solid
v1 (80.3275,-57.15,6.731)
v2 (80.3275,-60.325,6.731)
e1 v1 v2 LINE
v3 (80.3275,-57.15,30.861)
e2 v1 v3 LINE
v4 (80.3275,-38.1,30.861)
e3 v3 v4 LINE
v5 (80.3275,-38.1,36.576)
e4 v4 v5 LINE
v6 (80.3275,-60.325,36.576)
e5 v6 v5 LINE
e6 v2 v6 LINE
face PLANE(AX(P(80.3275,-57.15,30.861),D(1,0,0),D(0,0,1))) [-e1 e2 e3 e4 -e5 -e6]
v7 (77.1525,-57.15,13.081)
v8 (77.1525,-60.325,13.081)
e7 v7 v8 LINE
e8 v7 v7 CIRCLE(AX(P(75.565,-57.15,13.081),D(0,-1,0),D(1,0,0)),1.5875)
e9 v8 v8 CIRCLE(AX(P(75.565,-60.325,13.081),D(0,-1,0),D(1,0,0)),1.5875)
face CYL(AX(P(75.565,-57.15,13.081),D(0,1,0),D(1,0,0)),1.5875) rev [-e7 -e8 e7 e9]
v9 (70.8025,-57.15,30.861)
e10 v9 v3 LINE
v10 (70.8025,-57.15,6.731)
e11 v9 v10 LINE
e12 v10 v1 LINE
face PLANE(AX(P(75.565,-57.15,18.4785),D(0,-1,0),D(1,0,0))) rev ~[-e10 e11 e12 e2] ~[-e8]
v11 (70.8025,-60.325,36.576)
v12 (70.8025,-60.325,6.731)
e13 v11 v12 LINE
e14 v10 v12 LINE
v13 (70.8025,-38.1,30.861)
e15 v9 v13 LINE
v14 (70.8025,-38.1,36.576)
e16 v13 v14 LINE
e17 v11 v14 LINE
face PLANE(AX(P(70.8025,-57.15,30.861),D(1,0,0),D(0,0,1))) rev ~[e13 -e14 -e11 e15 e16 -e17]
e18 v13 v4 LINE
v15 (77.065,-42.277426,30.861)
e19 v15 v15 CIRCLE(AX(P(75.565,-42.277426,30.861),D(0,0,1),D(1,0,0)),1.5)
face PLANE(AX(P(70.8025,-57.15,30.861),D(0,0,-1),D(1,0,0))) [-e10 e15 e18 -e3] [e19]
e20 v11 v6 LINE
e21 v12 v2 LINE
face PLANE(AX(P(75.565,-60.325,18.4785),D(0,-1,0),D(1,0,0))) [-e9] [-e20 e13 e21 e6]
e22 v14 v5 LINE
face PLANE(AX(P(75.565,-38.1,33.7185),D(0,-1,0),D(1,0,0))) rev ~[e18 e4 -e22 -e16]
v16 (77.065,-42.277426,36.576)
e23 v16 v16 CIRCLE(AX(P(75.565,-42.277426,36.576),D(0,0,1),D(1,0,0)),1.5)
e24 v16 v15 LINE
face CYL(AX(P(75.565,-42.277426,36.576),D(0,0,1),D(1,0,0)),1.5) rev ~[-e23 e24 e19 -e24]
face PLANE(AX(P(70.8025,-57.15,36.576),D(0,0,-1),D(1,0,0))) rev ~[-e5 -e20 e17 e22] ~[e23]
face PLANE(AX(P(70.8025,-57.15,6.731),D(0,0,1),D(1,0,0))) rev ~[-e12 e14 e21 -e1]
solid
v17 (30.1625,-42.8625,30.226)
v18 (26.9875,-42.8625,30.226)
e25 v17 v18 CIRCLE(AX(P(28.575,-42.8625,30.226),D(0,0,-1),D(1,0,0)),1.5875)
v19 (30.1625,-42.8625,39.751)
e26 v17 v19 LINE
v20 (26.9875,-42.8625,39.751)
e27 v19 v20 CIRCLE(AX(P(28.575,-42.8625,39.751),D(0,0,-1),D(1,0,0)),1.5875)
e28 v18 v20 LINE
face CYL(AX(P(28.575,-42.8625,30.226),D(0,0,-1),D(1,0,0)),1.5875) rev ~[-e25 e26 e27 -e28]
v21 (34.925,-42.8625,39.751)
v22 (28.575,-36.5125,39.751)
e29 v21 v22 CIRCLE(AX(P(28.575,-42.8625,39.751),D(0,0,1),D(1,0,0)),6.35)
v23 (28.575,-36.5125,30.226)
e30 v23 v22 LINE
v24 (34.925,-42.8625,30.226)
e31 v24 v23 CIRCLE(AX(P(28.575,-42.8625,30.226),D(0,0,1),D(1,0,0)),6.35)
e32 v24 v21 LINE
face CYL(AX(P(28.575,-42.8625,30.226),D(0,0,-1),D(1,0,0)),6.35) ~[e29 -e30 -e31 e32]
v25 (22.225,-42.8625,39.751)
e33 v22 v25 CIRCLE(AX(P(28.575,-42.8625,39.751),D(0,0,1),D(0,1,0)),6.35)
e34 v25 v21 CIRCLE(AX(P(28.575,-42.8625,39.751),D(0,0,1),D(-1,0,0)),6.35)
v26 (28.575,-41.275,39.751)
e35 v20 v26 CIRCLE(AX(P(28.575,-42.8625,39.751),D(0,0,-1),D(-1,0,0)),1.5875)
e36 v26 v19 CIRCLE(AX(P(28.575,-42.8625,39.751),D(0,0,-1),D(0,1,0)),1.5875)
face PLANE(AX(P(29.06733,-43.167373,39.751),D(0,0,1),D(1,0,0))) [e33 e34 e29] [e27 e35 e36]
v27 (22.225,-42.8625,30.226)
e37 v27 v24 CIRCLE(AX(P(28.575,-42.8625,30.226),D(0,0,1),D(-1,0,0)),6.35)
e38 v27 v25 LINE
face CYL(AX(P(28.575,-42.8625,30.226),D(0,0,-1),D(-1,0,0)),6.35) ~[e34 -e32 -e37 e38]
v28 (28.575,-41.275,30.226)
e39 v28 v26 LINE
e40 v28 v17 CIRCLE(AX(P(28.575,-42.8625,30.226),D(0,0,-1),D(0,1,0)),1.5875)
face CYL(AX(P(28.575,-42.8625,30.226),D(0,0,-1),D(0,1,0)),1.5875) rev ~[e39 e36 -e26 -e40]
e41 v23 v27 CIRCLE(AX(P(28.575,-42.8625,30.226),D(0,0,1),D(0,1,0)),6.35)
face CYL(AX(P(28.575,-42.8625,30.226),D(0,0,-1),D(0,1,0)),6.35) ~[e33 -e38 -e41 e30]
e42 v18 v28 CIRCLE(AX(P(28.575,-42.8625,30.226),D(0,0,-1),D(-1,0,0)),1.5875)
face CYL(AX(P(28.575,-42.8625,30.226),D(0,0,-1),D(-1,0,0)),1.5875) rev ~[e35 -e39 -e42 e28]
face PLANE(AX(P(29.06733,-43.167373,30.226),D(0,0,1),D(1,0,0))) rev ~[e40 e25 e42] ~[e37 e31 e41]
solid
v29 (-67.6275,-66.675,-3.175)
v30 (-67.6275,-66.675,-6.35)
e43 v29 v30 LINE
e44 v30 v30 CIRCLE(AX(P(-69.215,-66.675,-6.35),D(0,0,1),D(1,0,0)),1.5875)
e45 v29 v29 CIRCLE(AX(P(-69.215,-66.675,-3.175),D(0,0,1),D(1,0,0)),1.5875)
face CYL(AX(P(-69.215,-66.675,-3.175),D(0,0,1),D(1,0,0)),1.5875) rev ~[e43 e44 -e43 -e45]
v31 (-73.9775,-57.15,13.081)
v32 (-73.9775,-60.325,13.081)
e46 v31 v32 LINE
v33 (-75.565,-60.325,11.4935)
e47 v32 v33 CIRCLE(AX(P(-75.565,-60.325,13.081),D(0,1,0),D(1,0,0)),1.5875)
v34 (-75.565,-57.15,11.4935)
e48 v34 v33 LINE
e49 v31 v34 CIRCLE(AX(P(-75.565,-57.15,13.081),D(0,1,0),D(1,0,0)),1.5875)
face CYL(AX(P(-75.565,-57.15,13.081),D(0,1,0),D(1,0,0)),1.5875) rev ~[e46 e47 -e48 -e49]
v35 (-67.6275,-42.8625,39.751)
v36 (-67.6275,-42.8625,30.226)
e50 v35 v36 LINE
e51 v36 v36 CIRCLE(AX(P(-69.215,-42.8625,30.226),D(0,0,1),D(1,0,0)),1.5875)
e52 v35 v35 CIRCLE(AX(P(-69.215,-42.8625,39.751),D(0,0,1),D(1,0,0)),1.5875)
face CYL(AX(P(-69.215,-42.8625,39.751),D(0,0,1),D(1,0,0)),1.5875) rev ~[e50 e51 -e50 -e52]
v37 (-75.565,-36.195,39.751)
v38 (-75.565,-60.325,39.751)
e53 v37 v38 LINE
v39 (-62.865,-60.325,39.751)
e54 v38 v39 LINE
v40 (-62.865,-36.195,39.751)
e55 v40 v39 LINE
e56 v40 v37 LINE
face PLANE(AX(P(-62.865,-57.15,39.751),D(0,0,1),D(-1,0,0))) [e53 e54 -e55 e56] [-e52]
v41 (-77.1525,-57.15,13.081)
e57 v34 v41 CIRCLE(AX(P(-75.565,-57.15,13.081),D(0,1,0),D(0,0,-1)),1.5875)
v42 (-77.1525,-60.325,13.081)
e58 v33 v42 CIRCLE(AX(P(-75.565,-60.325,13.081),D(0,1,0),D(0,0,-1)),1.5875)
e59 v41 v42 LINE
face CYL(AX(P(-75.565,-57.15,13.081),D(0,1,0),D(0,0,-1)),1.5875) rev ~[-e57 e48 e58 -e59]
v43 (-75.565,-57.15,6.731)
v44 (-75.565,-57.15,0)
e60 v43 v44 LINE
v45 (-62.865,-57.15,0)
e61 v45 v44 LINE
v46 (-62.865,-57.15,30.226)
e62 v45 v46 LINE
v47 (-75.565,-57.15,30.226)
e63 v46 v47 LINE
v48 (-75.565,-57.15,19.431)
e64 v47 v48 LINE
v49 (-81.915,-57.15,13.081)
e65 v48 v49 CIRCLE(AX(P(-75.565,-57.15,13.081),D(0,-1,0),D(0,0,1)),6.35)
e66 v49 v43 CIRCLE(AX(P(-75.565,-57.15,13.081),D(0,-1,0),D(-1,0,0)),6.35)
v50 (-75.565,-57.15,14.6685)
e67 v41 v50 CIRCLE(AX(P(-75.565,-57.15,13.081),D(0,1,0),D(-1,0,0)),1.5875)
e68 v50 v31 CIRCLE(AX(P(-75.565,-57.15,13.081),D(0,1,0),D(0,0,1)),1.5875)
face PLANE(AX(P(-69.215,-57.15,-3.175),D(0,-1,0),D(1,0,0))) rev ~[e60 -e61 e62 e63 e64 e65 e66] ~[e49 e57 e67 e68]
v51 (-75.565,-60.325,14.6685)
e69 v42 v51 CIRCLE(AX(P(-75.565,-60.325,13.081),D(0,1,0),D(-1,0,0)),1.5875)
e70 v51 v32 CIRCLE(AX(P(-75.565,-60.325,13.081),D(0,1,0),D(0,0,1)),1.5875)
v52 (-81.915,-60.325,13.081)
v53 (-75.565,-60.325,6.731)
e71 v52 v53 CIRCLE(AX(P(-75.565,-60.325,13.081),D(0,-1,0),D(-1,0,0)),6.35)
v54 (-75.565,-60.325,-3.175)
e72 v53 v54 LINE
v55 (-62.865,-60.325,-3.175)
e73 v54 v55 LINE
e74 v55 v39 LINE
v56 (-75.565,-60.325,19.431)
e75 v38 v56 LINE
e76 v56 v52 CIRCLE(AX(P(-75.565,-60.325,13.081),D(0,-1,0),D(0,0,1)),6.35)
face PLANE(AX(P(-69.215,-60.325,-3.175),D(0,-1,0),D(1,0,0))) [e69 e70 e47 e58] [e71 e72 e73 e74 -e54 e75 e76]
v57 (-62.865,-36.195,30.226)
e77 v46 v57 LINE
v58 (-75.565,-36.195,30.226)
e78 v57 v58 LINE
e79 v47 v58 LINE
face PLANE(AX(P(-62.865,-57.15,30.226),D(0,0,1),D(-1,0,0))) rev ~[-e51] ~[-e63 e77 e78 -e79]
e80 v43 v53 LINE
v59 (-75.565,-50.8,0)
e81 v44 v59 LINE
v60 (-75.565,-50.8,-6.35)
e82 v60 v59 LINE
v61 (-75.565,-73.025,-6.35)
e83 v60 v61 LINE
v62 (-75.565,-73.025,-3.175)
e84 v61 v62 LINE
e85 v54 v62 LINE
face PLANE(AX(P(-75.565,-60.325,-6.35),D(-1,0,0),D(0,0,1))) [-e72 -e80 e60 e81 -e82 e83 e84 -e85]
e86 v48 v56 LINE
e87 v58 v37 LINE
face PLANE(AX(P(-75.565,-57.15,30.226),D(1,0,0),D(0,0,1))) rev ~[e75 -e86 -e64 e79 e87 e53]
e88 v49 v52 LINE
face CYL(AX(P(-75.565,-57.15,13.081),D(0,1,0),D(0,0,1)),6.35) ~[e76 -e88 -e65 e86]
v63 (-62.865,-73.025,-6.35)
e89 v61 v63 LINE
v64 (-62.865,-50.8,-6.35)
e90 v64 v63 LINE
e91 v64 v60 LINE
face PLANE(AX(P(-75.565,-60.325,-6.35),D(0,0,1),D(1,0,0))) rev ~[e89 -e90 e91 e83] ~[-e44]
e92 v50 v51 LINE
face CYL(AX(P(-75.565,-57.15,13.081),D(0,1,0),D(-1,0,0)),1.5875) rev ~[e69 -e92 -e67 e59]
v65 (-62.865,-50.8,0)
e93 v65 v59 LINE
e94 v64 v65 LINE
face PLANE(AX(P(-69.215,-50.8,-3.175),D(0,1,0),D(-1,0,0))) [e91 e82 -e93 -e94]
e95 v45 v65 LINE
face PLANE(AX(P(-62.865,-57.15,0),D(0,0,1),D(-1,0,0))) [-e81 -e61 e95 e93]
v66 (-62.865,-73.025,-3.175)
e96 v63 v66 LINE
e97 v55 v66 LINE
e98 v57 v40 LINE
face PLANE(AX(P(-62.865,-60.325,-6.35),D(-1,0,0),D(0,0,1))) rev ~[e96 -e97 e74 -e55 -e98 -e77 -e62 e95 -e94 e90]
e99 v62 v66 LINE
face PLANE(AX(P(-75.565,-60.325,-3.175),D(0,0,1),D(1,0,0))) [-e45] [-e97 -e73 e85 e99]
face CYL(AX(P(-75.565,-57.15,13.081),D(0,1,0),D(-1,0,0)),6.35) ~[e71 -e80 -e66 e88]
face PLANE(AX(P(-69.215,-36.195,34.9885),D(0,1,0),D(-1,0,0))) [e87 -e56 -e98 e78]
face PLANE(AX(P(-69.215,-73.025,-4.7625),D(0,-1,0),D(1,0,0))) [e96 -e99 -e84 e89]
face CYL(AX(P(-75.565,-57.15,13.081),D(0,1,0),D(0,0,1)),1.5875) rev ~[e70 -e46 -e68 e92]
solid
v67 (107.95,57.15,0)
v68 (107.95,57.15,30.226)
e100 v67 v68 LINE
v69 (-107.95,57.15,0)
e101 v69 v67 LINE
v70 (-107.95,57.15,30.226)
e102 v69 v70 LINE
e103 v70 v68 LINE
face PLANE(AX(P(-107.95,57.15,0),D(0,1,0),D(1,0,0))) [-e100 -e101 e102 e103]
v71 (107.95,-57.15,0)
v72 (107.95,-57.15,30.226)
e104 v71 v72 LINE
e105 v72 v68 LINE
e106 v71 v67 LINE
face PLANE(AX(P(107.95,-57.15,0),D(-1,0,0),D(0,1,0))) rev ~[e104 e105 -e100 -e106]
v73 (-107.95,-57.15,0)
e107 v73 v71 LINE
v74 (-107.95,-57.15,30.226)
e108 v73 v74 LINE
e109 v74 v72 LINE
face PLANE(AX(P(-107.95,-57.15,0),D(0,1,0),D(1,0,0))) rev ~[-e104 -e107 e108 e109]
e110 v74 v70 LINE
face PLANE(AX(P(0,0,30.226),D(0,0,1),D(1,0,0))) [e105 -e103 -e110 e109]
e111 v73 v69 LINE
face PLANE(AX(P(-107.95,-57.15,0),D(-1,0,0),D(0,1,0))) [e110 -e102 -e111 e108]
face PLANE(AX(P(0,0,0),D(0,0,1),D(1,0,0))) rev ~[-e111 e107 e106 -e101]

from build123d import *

# Parameters (mm, degrees)
F0_W      = 215.9
F0_H      = 114.3
F1_DEPTH  = 30.226
F4_W      = 12.7
F4_H      = 6.35
F4_H_2    = 9.525
F5_DEPTH  = 3.175
F6_W      = 12.7
F6_H      = 6.35
F7_DEPTH  = 6.35
F6_H_2    = 9.525
F8_DEPTH  = 20.955
F9_W      = 12.7
F9_H      = 3.175
F10_DEPTH = 12.7
F11_R     = 1.5875
F12_DEPTH = 25.4
F13_R     = 1.5875
F14_DEPTH = 25.4
F17_DEPTH = 9.525
F18_W     = 9.525
F18_H     = 23.495
F18_R     = 1.5875
F18_H_2   = 5.715
F18_H_3   = 0.635
F19_DEPTH = 3.175
F20_DEPTH = 19.05
F21_R     = 1.5
F22_DEPTH = 25.4


with BuildPart() as f1:
    # F0 (on Top) → F1 (new body)
    with BuildSketch(Plane.XY):
        Rectangle(F0_W, F0_H)
    extrude(amount=F1_DEPTH)


with BuildPart() as f5:
    # F4 (on face) → F5 (new body)
    with BuildSketch(Plane.XZ.offset(57.15)):
        with Locations((-69.215, -3.175)):
            Rectangle(F4_W, F4_H)
        with BuildLine():
            Line((-75.565, 6.731), (-75.565, 0))
            Line((-75.565, 0), (-62.865, 0))
            Line((-62.865, 0), (-62.865, 30.226))
            Line((-62.865, 30.226), (-75.565, 30.226))
            Line((-75.565, 30.226), (-75.565, 19.431))
            ThreePointArc((-75.565, 19.431), (-71.0748719395, 17.5711280605), (-69.215, 13.081))
            ThreePointArc((-69.215, 13.081), (-71.0748719395, 8.5908719395), (-75.565, 6.731))
        make_face()
        with BuildLine():
            ThreePointArc((-81.915, 13.081), (-80.0551280605, 8.5908719395), (-75.565, 6.731))
            Line((-75.565, 6.731), (-75.565, 11.4935))
            ThreePointArc((-75.565, 11.4935), (-76.6875320151, 11.9584679849), (-77.1525, 13.081))
            Line((-77.1525, 13.081), (-81.915, 13.081))
        make_face()
        with BuildLine():
            Line((-75.565, 11.4935), (-75.565, 6.731))
            ThreePointArc((-75.565, 6.731), (-71.0748719395, 8.5908719395), (-69.215, 13.081))
            ThreePointArc((-69.215, 13.081), (-71.0748719395, 17.5711280605), (-75.565, 19.431))
            Line((-75.565, 19.431), (-75.565, 14.6685))
            ThreePointArc((-75.565, 14.6685), (-74.4424679849, 14.2035320151), (-73.9775, 13.081))
            ThreePointArc((-73.9775, 13.081), (-74.4424679849, 11.9584679849), (-75.565, 11.4935))
        make_face()
        with Locations((-69.215, 34.9885)):
            Rectangle(F4_W, F4_H_2)
        with BuildLine():
            ThreePointArc((-75.565, 19.431), (-80.0551280605, 17.5711280605), (-81.915, 13.081))
            Line((-81.915, 13.081), (-77.1525, 13.081))
            ThreePointArc((-77.1525, 13.081), (-76.6875320151, 14.2035320151), (-75.565, 14.6685))
            Line((-75.565, 14.6685), (-75.565, 19.431))
        make_face()
    extrude(amount=F5_DEPTH)

    # F6 (on face) → F7 (join)
    with BuildSketch(Plane(origin=(0, -57.15, 0), x_dir=(-1, 0, 0), z_dir=(0, 1, 0))):
        with Locations((69.215, -3.175)):
            Rectangle(F6_W, F6_H)
    extrude(amount=F7_DEPTH)

    # F6 (on face) → F8 (join)
    with BuildSketch(Plane(origin=(0, -57.15, 0), x_dir=(-1, 0, 0), z_dir=(0, 1, 0))):
        with Locations((69.215, 34.9885)):
            Rectangle(F6_W, F6_H_2)
    extrude(amount=F8_DEPTH)

    # F9 (on face) → F10 (join)
    with BuildSketch(Plane.XZ.offset(60.325)):
        with Locations((-69.215, -4.7625)):
            Rectangle(F9_W, F9_H)
    extrude(amount=F10_DEPTH)

    # F11 (on face) → F12 (cut)
    with BuildSketch(Plane.XY.offset(-3.175)):
        with Locations((-69.215, -66.675)):
            Circle(F11_R)
    extrude(amount=-F12_DEPTH, mode=Mode.SUBTRACT)

    # F13 (on face) → F14 (cut)
    with BuildSketch(Plane.XY.offset(39.751)):
        with Locations((-69.215, -42.8625)):
            Circle(F13_R)
    extrude(amount=-F14_DEPTH, mode=Mode.SUBTRACT)


with BuildPart() as f17:
    # F16 (on face) → F17 (new body)
    with BuildSketch(Plane.XY.offset(30.226)):
        with BuildLine():
            ThreePointArc((22.225, -42.8625), (28.575, -49.2125), (34.925, -42.8625))
            ThreePointArc((34.925, -42.8625), (33.0651280605, -38.3723719395), (28.575, -36.5125))
            Line((28.575, -36.5125), (28.575, -41.275))
            ThreePointArc((28.575, -41.275), (29.6975320151, -41.7399679849), (30.1625, -42.8625))
            ThreePointArc((30.1625, -42.8625), (28.575, -44.45), (26.9875, -42.8625))
            Line((26.9875, -42.8625), (22.225, -42.8625))
        make_face()
        with BuildLine():
            Line((28.575, -41.275), (28.575, -36.5125))
            ThreePointArc((28.575, -36.5125), (24.0848719395, -38.3723719395), (22.225, -42.8625))
            Line((22.225, -42.8625), (26.9875, -42.8625))
            ThreePointArc((26.9875, -42.8625), (27.4524679849, -41.7399679849), (28.575, -41.275))
        make_face()
    extrude(amount=F17_DEPTH)


with BuildPart() as f19:
    # F18 (on face) → F19 (new body)
    with BuildSketch(Plane.XZ.offset(57.15)):
        with Locations((75.565, 18.4785)):
            Rectangle(F18_W, F18_H)
        with Locations((75.565, 13.081)):
            Circle(F18_R, mode=Mode.SUBTRACT)
        with Locations((75.565, 33.7185)):
            Rectangle(F18_W, F18_H_2)
        with Locations((75.565, 30.5435)):
            Rectangle(F18_W, F18_H_3)
    extrude(amount=F19_DEPTH)

    # F18 (on face) → F20 (join)
    with BuildSketch(Plane.XZ.offset(57.15)):
        with Locations((75.565, 33.7185)):
            Rectangle(F18_W, F18_H_2)
    extrude(amount=-F20_DEPTH)

    # F21 (on face) → F22 (cut)
    with BuildSketch(Plane.XY.offset(36.576)):
        with Locations((75.565, -42.2774255276)):
            Circle(F21_R)
    extrude(amount=-F22_DEPTH, mode=Mode.SUBTRACT)


solid = Compound([f1.part, f5.part, f17.part, f19.part])
